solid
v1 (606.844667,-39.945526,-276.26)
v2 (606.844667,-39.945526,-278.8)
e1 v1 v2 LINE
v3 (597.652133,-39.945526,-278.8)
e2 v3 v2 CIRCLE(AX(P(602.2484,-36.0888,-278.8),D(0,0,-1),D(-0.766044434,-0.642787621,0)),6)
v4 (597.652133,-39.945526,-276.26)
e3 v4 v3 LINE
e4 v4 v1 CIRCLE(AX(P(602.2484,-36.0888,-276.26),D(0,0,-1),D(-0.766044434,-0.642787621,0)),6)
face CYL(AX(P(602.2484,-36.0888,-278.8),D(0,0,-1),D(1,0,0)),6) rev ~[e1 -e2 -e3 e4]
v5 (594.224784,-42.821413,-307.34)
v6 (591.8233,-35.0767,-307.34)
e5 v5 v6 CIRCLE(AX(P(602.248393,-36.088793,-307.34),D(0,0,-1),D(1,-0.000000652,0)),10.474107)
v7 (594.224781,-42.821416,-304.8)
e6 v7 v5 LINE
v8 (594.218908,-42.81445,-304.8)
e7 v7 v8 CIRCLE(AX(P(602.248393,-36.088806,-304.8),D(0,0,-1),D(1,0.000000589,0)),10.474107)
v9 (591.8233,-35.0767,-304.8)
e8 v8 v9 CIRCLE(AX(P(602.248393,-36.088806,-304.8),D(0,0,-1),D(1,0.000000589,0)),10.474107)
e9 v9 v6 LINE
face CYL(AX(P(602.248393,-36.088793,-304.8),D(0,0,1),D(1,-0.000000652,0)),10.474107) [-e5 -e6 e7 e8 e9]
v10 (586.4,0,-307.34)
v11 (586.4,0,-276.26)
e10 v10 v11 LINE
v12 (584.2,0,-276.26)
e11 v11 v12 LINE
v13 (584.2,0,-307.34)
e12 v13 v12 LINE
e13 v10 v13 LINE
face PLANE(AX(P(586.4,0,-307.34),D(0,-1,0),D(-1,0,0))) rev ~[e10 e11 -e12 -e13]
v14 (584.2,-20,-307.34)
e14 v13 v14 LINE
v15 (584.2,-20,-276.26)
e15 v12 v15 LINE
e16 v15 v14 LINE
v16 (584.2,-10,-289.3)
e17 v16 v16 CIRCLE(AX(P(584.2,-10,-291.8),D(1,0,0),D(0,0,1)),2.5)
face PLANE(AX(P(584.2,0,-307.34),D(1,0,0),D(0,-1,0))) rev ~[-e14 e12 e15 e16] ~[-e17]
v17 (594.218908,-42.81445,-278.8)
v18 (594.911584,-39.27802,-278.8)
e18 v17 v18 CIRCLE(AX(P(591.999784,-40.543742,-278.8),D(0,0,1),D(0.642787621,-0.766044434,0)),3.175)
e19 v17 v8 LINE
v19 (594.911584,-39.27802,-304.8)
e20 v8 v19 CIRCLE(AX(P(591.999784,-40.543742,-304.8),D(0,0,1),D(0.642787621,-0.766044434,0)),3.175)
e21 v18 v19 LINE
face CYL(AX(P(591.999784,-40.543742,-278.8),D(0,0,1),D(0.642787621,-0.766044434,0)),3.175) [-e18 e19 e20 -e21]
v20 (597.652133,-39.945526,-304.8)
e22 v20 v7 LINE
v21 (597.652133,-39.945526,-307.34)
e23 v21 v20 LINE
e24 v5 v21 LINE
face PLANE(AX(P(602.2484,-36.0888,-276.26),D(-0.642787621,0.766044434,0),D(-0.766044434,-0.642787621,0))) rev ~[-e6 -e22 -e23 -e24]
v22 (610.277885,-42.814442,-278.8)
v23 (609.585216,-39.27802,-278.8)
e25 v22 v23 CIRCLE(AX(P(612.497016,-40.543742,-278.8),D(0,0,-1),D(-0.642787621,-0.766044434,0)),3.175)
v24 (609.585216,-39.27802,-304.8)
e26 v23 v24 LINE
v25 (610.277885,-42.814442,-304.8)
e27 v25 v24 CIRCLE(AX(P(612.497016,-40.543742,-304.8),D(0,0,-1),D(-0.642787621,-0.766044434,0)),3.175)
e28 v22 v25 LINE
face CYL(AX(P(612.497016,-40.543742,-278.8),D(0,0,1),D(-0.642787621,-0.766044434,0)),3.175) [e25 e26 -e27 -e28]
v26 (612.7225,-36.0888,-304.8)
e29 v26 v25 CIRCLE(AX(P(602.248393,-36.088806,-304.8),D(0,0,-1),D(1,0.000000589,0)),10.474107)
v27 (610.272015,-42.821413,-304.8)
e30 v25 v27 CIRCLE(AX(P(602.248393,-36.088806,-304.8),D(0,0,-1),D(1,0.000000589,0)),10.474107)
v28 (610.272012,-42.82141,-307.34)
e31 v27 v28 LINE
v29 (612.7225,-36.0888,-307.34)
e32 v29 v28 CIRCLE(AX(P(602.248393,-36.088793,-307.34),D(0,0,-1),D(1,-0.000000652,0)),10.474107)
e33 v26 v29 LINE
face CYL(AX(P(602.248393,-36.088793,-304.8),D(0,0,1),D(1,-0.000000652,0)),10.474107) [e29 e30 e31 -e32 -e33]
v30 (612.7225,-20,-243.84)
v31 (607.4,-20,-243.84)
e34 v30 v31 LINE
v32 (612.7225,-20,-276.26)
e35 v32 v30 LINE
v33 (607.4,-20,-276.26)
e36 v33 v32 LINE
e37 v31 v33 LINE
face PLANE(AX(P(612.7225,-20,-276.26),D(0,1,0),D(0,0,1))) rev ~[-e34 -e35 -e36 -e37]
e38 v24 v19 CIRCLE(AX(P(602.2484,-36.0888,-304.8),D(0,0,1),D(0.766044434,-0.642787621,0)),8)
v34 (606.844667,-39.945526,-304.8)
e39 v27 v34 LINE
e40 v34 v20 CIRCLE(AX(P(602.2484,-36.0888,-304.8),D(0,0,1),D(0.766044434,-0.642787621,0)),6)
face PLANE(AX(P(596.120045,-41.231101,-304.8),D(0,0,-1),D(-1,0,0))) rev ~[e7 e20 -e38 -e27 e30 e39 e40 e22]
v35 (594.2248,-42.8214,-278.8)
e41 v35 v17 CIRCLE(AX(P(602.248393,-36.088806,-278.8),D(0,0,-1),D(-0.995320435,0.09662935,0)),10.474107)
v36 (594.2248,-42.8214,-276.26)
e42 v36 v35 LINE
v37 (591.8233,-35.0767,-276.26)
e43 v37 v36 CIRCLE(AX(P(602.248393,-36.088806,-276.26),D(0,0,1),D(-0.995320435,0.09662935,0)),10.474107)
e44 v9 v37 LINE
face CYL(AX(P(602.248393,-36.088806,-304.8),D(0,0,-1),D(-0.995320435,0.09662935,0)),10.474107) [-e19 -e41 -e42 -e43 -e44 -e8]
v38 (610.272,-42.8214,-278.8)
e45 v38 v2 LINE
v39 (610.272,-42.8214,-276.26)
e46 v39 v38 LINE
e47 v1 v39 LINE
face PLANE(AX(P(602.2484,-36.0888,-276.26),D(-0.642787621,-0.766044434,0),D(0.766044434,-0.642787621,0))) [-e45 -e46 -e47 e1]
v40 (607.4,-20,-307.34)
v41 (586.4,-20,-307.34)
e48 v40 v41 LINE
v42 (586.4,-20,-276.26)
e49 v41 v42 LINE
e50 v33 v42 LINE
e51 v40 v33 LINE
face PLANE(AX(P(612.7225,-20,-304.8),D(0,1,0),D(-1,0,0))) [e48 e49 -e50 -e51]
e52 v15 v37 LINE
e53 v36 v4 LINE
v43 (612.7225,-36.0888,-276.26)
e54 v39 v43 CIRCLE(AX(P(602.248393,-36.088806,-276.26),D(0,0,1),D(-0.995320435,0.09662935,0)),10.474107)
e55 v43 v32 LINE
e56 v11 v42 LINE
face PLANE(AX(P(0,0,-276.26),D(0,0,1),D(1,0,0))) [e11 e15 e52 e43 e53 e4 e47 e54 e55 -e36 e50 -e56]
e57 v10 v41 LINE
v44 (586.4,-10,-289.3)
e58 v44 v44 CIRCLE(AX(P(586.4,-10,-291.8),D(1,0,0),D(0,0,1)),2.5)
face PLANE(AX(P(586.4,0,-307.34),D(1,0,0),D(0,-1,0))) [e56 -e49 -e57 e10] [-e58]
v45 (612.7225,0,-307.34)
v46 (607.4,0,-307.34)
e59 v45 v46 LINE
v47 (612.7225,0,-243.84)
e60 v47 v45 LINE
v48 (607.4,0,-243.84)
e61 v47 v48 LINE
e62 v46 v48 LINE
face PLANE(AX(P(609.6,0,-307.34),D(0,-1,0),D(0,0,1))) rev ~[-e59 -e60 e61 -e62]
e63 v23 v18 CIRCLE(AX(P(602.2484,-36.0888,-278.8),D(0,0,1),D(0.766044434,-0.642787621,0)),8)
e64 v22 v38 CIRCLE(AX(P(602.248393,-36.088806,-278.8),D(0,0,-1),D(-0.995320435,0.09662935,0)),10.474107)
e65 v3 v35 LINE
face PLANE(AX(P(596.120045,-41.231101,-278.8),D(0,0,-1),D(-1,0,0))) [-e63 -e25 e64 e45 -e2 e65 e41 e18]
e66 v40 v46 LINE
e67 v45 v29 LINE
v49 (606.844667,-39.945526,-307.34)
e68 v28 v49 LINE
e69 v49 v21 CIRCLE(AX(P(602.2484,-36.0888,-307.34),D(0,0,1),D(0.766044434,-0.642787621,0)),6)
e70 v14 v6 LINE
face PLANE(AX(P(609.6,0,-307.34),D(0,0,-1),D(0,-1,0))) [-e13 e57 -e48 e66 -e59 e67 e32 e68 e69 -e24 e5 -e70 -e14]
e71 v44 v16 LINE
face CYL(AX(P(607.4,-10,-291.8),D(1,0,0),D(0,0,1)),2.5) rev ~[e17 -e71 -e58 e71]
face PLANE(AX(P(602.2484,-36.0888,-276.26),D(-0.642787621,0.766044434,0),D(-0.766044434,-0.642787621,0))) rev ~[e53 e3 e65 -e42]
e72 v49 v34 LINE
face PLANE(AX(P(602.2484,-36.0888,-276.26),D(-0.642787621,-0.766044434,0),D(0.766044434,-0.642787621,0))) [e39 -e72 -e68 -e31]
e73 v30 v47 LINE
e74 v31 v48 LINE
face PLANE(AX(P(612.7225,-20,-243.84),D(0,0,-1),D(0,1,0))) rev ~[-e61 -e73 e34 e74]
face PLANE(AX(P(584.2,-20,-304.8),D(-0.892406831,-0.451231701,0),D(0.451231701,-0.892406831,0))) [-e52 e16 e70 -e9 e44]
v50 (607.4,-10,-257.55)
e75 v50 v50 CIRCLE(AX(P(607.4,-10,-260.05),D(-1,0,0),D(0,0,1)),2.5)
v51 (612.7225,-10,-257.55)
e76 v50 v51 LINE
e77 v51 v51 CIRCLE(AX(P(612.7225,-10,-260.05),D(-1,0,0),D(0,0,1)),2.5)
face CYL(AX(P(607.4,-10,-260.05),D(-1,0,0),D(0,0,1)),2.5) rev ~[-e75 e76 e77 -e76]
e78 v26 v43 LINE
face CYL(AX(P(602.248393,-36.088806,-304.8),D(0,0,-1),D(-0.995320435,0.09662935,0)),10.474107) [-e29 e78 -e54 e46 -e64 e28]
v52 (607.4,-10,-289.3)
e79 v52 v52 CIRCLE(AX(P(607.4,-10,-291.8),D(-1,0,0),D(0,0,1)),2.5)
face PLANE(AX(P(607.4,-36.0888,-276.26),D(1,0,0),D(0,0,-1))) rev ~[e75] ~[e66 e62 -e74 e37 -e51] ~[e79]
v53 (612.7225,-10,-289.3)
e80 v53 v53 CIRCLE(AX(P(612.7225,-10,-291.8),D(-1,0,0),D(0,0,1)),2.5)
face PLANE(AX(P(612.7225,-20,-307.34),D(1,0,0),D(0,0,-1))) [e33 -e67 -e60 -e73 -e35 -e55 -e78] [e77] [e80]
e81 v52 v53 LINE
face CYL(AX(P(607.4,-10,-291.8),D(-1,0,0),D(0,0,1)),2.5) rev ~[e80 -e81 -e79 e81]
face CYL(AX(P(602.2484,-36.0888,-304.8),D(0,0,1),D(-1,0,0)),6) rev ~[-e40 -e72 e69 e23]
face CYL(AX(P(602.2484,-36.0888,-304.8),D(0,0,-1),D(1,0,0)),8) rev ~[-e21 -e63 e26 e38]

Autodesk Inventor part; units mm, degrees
ref_plane "YZ Plane" through (0, 0, 0) normal (1, 0, 0) x (0, 1, 0)
ref_plane "XZ Plane" through (0, 0, 0) normal (0, 1, 0) x (-1, 0, 0)
ref_plane "XY Plane" through (0, 0, 0) normal (0, 0, 1) x (1, 0, 0)
ref_plane "Work Plane1" through (0, 0, -304.8) normal (0, 0, 1) x (1, 0, 0)
sketch "Sketch1" plane through (0, 0, -304.8) normal (0, 0, 1) x (1, 0, 0)
  circle A0 centre (602.2484, -36.0888) radius 4 projected
  line L0 (25.4, 0) -> (584.2, 0) projected
  line L1 (584.2, 0) -> (584.2, -20) projected
  line L2 (609.6, -20) -> (584.2, -20) projected
  line L3 (609.6, -20) -> (609.6, 3.175) projected
  line L4 (0, 3.175) -> (609.6, 3.175) projected
  line L5 (0, -20) -> (0, 3.175) projected
  line L6 (25.4, -20) -> (0, -20) projected
  line L7 (25.4, 0) -> (25.4, -20) projected
  circle A1 centre (602.2484, -36.0888) radius 8
  line L8 (595.3202, -40.0888) -> (593.5242, -41.8849)
  line L9 (595.3202, -40.0888) -> (597.8602, -40.0888) construction
  arc A2 (591.8233, -35.0767) -> (612.7225, -36.0888) centre (602.2484, -36.0888) ccw
  line L10 (609.6, -20) -> (584.2, -20)
  line L11 (586.9, -20) -> (606.9, -20)
  line L12 (612.7225, -20) -> (609.6, -20)
  line L13 (612.7225, -36.0888) -> (612.7225, -20)
  line L14 (584.2, -20) -> (591.8233, -35.0767)
  point P0 (0, 0)
  dimension "d0" = 16
  dimension "d1" = 2.54
  dimension "d2" = 135
  dimension "d3" = 20
extrude "Extrusion1" add sketch "Sketch1" along normal blind 26 contours L2 L12 L13 A2 L14
sketch "Sketch2" plane through (0, 0, -278.8) normal (0, 0, 1) x (1, 0, 0)
  circle A0 centre (602.2484, -36.0888) radius 8 projected
  line L0 (584.2, -20) -> (591.8233, -35.0767) projected
  arc A1 (591.8233, -35.0767) -> (612.7225, -36.0888) centre (602.2484, -36.0888) ccw projected
  line L1 (612.7225, -36.0888) -> (612.7225, -20) projected
  line L2 (612.7225, -20) -> (584.2, -20) projected
  circle A2 centre (602.2484, -36.0888) radius 6
  point P0 (0, 0)
  dimension "d7" = 12
extrude "Extrusion2" add sketch "Sketch2" along normal blind 2.54 contours A0 | L2 L1 A1 L0
sketch "Sketch3" plane through (0, 0, -304.8) normal (0, 0, -1) x (-1, 0, 0)
  circle A0 centre (-602.2484, -36.0888) radius 6 projected
  line L0 (-584.2, -20) -> (-591.8233, -35.0767) projected
  arc A1 (-612.7225, -36.0888) -> (-591.8233, -35.0767) centre (-602.2484, -36.0888) ccw projected
  line L1 (-612.7225, -36.0888) -> (-612.7225, -20) projected
  line L2 (-612.7225, -20) -> (-584.2, -20) projected
  point P0 (0, 0)
extrude "Extrusion3" add sketch "Sketch3" along normal blind 2.54
sketch "Sketch4" plane through (0, 0, -276.26) normal (0, 0, 1) x (1, 0, 0)
  circle A0 centre (602.2484, -36.0888) radius 6 projected
  line L0 (584.2, -20) -> (591.8233, -35.0767) projected
  arc A1 (591.8233, -35.0767) -> (612.7225, -36.0888) centre (602.2484, -36.0888) ccw projected
  line L1 (612.7225, -36.0888) -> (612.7225, -20) projected
  line L2 (612.7225, -20) -> (584.2, -20) projected
  line L3 (602.2484, -36.0888) -> (610.272, -42.8214)
  arc A2 (591.8233, -35.0767) -> (612.7225, -36.0888) centre (602.2484, -36.0888) ccw projected
  line L4 (602.2484, -36.0888) -> (612.7225, -36.0888) construction
  circle A3 centre (602.2484, -36.0888) radius 6 projected
  line L5 (602.2484, -36.0888) -> (594.2248, -42.8214)
  line L6 (602.2484, -36.0888) -> (612.7225, -36.0888) construction
  arc A4 (594.2248, -42.8214) -> (610.272, -42.8214) centre (602.2484, -36.0888) ccw
  line L7 (602.2484, -36.0888) -> (594.2248, -42.8214)
  line L8 (602.2484, -36.0888) -> (610.272, -42.8214)
  point P0 (0, 0)
  dimension "d12" = 40
  dimension "d13" = 140
extrude "Extrusion4" cut sketch "Sketch4" against normal blind 39.0525 contours L5 L3 A0 | A0 L3 A1 L5 picked at (604.1466, -39.5744)
fillet "Fillet1" radius 3.175 2 edges at (596.1201, -41.2311, -291.8) (608.3768, -41.2311, -291.8)
sketch "Sketch5" plane through (0, 0, -276.26) normal (0, 0, 1) x (1, 0, 0)
  point P0 (0, 0)
sketch "Sketch6" plane through (0, 0, -307.34) normal (0, 0, -1) x (-1, 0, 0)
  point P0 (0, 0)
sketch "Sketch7" plane through (0, 0, -307.34) normal (0, 0, -1) x (-1, 0, 0)
  line L0 (-25.4, 0) -> (-584.2, 0) projected
  line L1 (-584.2, 0) -> (-584.2, -20) projected
  line L2 (-609.6, -20) -> (-584.2, -20) projected
  line L3 (-609.6, -20) -> (-609.6, 3.175) projected
  line L4 (0, 3.175) -> (-609.6, 3.175) projected
  line L5 (0, -20) -> (0, 3.175) projected
  line L6 (-25.4, -20) -> (0, -20) projected
  line L7 (-25.4, 0) -> (-25.4, -20) projected
  line L8 (-606.8447, -39.9455) -> (-610.272, -42.8214) projected
  arc A0 (-612.7225, -36.0888) -> (-610.272, -42.8214) centre (-602.2484, -36.0888) ccw projected
  line L9 (-612.7225, -36.0888) -> (-612.7225, -20) projected
  line L10 (-612.7225, -20) -> (-584.2, -20) projected
  line L11 (-584.2, -20) -> (-591.8233, -35.0767) projected
  arc A1 (-594.2248, -42.8214) -> (-591.8233, -35.0767) centre (-602.2484, -36.0888) ccw projected
  line L12 (-594.2248, -42.8214) -> (-597.6521, -39.9455) projected
  arc A2 (-597.6521, -39.9455) -> (-606.8447, -39.9455) centre (-602.2484, -36.0888) ccw projected
  line L13 (-586.4, 0) -> (-586.4, -20)
  line L14 (-607.4, -20) -> (-607.4, 0)
  line L15 (-586.4, 0) -> (-584.2, 0)
  line L16 (-584.2, 0) -> (-584.2, -20)
  line L17 (-584.2, -20) -> (-586.4, -20)
  line L18 (-586.4, 0) -> (-586.4, -20)
  line L19 (-607.4, 0) -> (-609.6, 0)
  line L20 (-609.6, 0) -> (-609.6, -20)
  line L21 (-609.6, -20) -> (-607.4, -20)
  point P0 (0, 0)
  dimension "d17" = 21
  dimension "d18" = 20
extrude "Extrusion5" add sketch "Sketch7" against normal up to surface (31.08 mm away) contours L1 L2 L13 L15 | L2 L3 L19 L14
sketch "Sketch8" plane through (609.6, -20, -307.34) normal (1, 0, 0) x (0, 0, -1)
  line L0 (-31.08, 20) -> (-31.08, 0) projected
  line L1 (0, 0) -> (-31.08, 0) projected
  line L2 (0, 20) -> (0, 0) projected
  line L3 (0, 20) -> (-31.08, 20) projected
  point P0 (-307.34, 20)
extrude "Extrusion6" add sketch "Sketch8" along normal up to surface (3.1225 mm away)
sketch "Sketch9" plane through (612.7225, -36.0888, -276.26) normal (1, 0, 0) x (0, 0, -1)
  line L0 (0, -3.8567) -> (0, -6.7326) projected
  line L1 (0, -6.7326) -> (0, 0) projected
  line L2 (0, 0) -> (0, 36.0888) projected
  line L3 (0, 16.0888) -> (0, 36.0888) projected
  line L4 (0, 36.0888) -> (0, 16.0888) projected
  line L5 (0, 16.0888) -> (0, 36.0888) projected
  line L6 (0, 16.0888) -> (0, 1.0121) projected
  line L7 (0, 1.0121) -> (0, -6.7326) projected
  line L8 (0, -6.7326) -> (0, -3.8567) projected
  line L9 (0, -3.8567) -> (0, -3.8567) projected
  line L10 (31.08, 16.0888) -> (0, 16.0888) projected
  line L11 (31.08, 16.0888) -> (-32.42, 16.0888)
  line L12 (-32.42, 16.0888) -> (-32.42, 36.0888)
  line L13 (-32.42, 36.0888) -> (31.08, 36.0888)
  line L14 (31.08, 36.0888) -> (31.08, 16.0888)
  point P0 (-276.26, 36.0888)
  dimension "d23" = 63.5
  dimension "d24" = 20
extrude "Extrusion7" add sketch "Sketch9" against normal up to surface (5.3225 mm away)
sketch "Sketch10" plane through (607.4, -20, -307.34) normal (-1, 0, 0) x (0, 0, 1)
  line L0 (31.08, -16.0888) -> (31.08, 0) projected
  line L1 (0, -16.0888) -> (31.08, -16.0888) projected
  line L2 (0, 20) -> (0, -16.0888) projected
  line L3 (63.5, 20) -> (0, 20) projected
  line L4 (63.5, 20) -> (63.5, 0) projected
  line L5 (63.5, 0) -> (31.08, 0) projected
  circle A0 centre (47.29, 10) radius 2.5
  circle A1 centre (15.54, 10) radius 2.5
  point P0 (307.34, 20)
  dimension "d27" = 5
  dimension "d28" = 5
extrude "Extrusion8" cut sketch "Sketch10" along normal mid plane 254 contours A0 | A1
properties part number "Bed Slider"
